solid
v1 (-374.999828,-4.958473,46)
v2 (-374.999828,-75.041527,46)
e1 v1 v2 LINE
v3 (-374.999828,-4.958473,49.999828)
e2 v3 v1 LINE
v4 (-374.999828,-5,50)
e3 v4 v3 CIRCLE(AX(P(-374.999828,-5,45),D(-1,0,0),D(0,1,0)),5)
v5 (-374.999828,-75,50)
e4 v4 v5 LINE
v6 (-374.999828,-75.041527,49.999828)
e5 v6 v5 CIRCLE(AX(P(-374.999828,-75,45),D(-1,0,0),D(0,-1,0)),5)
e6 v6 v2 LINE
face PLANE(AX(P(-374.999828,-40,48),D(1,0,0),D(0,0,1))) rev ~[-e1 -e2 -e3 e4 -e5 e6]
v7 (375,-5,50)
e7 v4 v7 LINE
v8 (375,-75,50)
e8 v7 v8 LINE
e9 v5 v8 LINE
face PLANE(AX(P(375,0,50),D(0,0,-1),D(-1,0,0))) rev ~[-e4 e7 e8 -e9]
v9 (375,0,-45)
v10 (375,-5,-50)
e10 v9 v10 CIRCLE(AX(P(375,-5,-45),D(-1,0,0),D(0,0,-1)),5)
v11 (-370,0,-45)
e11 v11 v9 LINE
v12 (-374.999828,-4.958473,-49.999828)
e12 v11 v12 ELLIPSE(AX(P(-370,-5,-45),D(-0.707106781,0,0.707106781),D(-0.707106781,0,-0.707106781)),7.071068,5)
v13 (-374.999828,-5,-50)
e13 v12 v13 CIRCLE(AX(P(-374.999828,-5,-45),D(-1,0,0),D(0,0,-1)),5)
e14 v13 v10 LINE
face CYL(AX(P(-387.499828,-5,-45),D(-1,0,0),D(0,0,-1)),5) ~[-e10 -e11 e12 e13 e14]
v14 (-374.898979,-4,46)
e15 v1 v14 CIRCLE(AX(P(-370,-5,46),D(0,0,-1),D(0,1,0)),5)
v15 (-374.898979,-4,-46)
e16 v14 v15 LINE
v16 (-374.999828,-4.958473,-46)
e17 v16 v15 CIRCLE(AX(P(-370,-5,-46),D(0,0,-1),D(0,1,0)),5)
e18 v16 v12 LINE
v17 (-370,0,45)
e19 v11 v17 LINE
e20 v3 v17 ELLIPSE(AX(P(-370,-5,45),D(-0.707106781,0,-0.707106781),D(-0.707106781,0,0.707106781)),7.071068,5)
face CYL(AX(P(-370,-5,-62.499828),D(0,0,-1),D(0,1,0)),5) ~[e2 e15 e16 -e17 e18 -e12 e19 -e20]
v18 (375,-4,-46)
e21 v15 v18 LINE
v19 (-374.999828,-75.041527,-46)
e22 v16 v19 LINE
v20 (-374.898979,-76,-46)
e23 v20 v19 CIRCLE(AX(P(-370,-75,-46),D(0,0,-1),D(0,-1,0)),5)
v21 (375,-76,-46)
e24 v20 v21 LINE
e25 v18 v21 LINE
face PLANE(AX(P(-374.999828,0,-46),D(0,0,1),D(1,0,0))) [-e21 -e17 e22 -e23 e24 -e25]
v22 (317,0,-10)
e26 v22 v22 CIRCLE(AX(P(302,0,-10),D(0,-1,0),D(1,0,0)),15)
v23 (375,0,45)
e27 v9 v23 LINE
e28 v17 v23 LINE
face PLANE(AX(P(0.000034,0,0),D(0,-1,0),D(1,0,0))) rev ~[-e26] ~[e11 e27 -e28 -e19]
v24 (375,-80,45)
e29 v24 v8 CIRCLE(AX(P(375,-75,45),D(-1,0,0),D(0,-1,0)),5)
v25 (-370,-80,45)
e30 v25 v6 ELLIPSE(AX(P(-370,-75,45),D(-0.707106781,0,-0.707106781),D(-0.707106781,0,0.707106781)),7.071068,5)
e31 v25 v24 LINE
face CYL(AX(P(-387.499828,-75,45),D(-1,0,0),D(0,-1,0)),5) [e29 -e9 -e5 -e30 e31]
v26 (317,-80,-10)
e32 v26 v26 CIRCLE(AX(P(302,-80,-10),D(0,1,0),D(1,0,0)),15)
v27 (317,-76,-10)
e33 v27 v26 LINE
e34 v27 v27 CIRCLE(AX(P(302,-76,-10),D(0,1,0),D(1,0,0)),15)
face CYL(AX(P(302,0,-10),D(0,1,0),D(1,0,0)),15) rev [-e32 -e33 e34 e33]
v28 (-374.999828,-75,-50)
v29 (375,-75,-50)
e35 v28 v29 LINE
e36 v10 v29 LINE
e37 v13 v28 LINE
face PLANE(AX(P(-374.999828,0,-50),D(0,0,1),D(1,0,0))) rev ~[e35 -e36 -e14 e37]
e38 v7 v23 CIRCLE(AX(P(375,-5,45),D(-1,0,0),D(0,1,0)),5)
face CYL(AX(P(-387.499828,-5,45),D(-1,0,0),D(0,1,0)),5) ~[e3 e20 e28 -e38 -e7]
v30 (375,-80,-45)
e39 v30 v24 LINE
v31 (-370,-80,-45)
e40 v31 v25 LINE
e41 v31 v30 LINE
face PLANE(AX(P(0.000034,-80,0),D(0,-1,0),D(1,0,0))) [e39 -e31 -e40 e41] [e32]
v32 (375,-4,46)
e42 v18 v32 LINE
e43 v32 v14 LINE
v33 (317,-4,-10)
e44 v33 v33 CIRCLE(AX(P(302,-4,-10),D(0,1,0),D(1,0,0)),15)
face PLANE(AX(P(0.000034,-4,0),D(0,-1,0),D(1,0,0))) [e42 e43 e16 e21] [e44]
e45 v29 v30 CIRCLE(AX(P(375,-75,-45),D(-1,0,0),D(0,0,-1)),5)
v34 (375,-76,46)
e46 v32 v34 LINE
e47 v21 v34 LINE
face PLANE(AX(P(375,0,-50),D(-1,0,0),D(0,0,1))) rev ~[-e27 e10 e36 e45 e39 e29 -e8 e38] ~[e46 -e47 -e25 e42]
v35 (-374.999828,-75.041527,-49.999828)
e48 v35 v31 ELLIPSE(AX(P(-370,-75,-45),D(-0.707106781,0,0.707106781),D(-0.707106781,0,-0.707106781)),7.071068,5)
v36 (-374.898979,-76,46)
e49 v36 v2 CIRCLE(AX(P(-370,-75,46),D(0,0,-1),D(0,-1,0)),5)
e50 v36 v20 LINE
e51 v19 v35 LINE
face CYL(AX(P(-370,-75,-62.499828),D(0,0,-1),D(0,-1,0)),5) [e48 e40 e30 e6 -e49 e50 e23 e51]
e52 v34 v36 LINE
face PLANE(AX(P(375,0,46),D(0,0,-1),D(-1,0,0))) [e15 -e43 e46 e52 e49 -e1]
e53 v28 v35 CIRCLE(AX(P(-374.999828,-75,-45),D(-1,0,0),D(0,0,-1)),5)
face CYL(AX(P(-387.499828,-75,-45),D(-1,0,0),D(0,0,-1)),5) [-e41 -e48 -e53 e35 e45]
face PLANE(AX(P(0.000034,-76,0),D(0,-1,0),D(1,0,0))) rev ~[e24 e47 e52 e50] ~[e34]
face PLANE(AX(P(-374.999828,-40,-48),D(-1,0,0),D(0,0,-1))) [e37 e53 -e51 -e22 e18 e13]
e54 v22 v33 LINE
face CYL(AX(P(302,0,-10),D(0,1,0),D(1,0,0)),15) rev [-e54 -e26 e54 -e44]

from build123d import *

# Parameters (mm, degrees)
F1_DEPTH     = 80
F2_T         = 4
F3_T1_DEPTH  = 774.9998275448
F3_T3_DEPTH  = 124.9996550895
F3_T6_ANGLE  = 90.0000000944
F3_T8_ANGLE  = 89.9999999363
F3_T10_ANGLE = 90.0000000944
F3_T12_ANGLE = 89.9999999363
F4_R         = 15
F5_DEPTH     = 80.001


# Not quite as in the source:
# - a fillet or chamfer that OpenCascade refuses, or shapes differently, is made with other operations: its cross-section is extruded or revolved along the edge and cut away or added
# - a shell that OpenCascade refuses in one call is made with other operations: the cavity is built on its own and cut out


with BuildPart() as f1:
    # F0 (on Front) → F1 (new body)
    with BuildSketch(Plane.XZ):
        with BuildLine():
            Line((-374.9998275448, -50), (375, -50))
            Line((375, -50), (375, 50))
            Line((375, 50), (-374.9998275448, 50))
            ThreePointArc((-374.9998275448, 50), (-374.999949489, 49.999949489), (-375, 49.9998275448))
            Line((-375, 49.9998275448), (-375, -49.9998275448))
            ThreePointArc((-375, -49.9998275448), (-374.999949489, -49.999949489), (-374.9998275448, -50))
        make_face()
    extrude(amount=F1_DEPTH)

    # F2: shell of thickness 4, made by hand


with BuildPart() as f2_core1:
    # F2_t2: copy of F1
    add(f1.part)

    # the walls: a layer under each face that stays
    f2_faces = [f2_core1.faces().sort_by_distance(p)[0] for p in [
        (8.62276e-05, -40, -50),
        (8.62276e-05, -40, 50),
        (0, 0, 0),
        (0, -80, 0),
    ]]
    thicken(f2_faces, amount=-F2_T, mode=Mode.SUBTRACT)


with BuildPart() as f1_1:
    add(f1.part)

    # what is left inside the walls is the cavity
    f2_cavity = [f2_core1.part.solids().sort_by_distance(p)[0] for p in [
        (0, -4.04, -16.666667),
    ]]
    add(f2_cavity, mode=Mode.SUBTRACT)

    # F3: fillet of radius 5 on 4 edges, made by hand

    # F3_s2 → F3_t1 (cut)
    with BuildSketch(Plane.YZ.offset(-387.4998275448)):
        with BuildLine():
            ThreePointArc((-80, 45), (-78.5355339059, 48.5355339059), (-75, 50))
            Line((-75, 50), (-80, 50))
            Line((-80, 50), (-80, 45))
        make_face()
        with BuildLine():
            ThreePointArc((0, 45), (-1.4644660941, 48.5355339059), (-5, 50))
            Line((-5, 50), (0, 50))
            Line((0, 50), (0, 45))
        make_face()
        with BuildLine():
            ThreePointArc((-5, -50), (-1.4644660941, -48.5355339059), (0, -45))
            Line((0, -45), (0, -50))
            Line((0, -50), (-5, -50))
        make_face()
        with BuildLine():
            ThreePointArc((-75, -50), (-78.5355339059, -48.5355339059), (-80, -45))
            Line((-80, -45), (-80, -50))
            Line((-80, -50), (-75, -50))
        make_face()
    extrude(amount=F3_T1_DEPTH, mode=Mode.SUBTRACT)

    # F3_s4 → F3_t3 (cut)
    with BuildSketch(Plane.XY.offset(-62.4998275448)):
        with BuildLine():
            ThreePointArc((-370, -80), (-373.5355339059, -78.5355339059), (-375, -75))
            Line((-375, -75), (-375, -80))
            Line((-375, -80), (-370, -80))
        make_face()
        with BuildLine():
            ThreePointArc((-370, 0), (-373.5355339059, -1.4644660941), (-375, -5))
            Line((-375, -5), (-375, 0))
            Line((-375, 0), (-370, 0))
        make_face()
    extrude(amount=F3_T3_DEPTH, mode=Mode.SUBTRACT)

    # F3_s5 → F3_t6 (revolve, cut)
    with BuildSketch(Plane.XY.offset(-49.9998275448)):
        with BuildLine():
            ThreePointArc((-375, -75), (-374.999956886, -75.0207638646), (-374.9998275448, -75.0415273711))
            Line((-374.9998275448, -75.0415273711), (-374.9998275448, -80))
            Line((-374.9998275448, -80), (-375, -80))
            Line((-375, -80), (-375, -75))
        make_face()
    revolve(axis=Axis((-374.9998275448, -80, -49.9998275448), (0, -1, 0)), revolution_arc=F3_T6_ANGLE, mode=Mode.SUBTRACT)

    # F3_s7 → F3_t8 (revolve, cut)
    with BuildSketch(Plane.YZ.offset(-374.9998275448)):
        with BuildLine():
            ThreePointArc((-75.0415273711, 49.9998275448), (-75.0207638646, 49.999956886), (-75, 50))
            Line((-75, 50), (-80, 50))
            Line((-80, 50), (-80, 49.9998275448))
            Line((-80, 49.9998275448), (-75.0415273711, 49.9998275448))
        make_face()
    revolve(axis=Axis((-374.9998275448, -80, 49.9998275448), (0, -1, 0)), revolution_arc=F3_T8_ANGLE, mode=Mode.SUBTRACT)

    # F3_s9 → F3_t10 (revolve, cut)
    with BuildSketch(Plane.XY.offset(-49.9998275448)):
        with BuildLine():
            ThreePointArc((-375, -5), (-374.999956886, -4.9792361354), (-374.9998275448, -4.9584726289))
            Line((-374.9998275448, -4.9584726289), (-374.9998275448, 0))
            Line((-374.9998275448, 0), (-375, 0))
            Line((-375, 0), (-375, -5))
        make_face()
    revolve(axis=Axis((-374.9998275448, 0, -49.9998275448), (0, -1, 0)), revolution_arc=F3_T10_ANGLE, mode=Mode.SUBTRACT)

    # F3_s11 → F3_t12 (revolve, cut)
    with BuildSketch(Plane.YZ.offset(-374.9998275448)):
        with BuildLine():
            ThreePointArc((-4.9584726289, 49.9998275448), (-4.9792361354, 49.999956886), (-5, 50))
            Line((-5, 50), (0, 50))
            Line((0, 50), (0, 49.9998275448))
            Line((0, 49.9998275448), (-4.9584726289, 49.9998275448))
        make_face()
    revolve(axis=Axis((-374.9998275448, 0, 49.9998275448), (0, -1, 0)), revolution_arc=F3_T12_ANGLE, mode=Mode.SUBTRACT)

    # F4 (on Front) → F5 (cut, through all)
    with BuildSketch(Plane.XZ):
        with Locations((302, -10)):
            Circle(F4_R)
    extrude(amount=F5_DEPTH, mode=Mode.SUBTRACT)


solid = f1_1.part
